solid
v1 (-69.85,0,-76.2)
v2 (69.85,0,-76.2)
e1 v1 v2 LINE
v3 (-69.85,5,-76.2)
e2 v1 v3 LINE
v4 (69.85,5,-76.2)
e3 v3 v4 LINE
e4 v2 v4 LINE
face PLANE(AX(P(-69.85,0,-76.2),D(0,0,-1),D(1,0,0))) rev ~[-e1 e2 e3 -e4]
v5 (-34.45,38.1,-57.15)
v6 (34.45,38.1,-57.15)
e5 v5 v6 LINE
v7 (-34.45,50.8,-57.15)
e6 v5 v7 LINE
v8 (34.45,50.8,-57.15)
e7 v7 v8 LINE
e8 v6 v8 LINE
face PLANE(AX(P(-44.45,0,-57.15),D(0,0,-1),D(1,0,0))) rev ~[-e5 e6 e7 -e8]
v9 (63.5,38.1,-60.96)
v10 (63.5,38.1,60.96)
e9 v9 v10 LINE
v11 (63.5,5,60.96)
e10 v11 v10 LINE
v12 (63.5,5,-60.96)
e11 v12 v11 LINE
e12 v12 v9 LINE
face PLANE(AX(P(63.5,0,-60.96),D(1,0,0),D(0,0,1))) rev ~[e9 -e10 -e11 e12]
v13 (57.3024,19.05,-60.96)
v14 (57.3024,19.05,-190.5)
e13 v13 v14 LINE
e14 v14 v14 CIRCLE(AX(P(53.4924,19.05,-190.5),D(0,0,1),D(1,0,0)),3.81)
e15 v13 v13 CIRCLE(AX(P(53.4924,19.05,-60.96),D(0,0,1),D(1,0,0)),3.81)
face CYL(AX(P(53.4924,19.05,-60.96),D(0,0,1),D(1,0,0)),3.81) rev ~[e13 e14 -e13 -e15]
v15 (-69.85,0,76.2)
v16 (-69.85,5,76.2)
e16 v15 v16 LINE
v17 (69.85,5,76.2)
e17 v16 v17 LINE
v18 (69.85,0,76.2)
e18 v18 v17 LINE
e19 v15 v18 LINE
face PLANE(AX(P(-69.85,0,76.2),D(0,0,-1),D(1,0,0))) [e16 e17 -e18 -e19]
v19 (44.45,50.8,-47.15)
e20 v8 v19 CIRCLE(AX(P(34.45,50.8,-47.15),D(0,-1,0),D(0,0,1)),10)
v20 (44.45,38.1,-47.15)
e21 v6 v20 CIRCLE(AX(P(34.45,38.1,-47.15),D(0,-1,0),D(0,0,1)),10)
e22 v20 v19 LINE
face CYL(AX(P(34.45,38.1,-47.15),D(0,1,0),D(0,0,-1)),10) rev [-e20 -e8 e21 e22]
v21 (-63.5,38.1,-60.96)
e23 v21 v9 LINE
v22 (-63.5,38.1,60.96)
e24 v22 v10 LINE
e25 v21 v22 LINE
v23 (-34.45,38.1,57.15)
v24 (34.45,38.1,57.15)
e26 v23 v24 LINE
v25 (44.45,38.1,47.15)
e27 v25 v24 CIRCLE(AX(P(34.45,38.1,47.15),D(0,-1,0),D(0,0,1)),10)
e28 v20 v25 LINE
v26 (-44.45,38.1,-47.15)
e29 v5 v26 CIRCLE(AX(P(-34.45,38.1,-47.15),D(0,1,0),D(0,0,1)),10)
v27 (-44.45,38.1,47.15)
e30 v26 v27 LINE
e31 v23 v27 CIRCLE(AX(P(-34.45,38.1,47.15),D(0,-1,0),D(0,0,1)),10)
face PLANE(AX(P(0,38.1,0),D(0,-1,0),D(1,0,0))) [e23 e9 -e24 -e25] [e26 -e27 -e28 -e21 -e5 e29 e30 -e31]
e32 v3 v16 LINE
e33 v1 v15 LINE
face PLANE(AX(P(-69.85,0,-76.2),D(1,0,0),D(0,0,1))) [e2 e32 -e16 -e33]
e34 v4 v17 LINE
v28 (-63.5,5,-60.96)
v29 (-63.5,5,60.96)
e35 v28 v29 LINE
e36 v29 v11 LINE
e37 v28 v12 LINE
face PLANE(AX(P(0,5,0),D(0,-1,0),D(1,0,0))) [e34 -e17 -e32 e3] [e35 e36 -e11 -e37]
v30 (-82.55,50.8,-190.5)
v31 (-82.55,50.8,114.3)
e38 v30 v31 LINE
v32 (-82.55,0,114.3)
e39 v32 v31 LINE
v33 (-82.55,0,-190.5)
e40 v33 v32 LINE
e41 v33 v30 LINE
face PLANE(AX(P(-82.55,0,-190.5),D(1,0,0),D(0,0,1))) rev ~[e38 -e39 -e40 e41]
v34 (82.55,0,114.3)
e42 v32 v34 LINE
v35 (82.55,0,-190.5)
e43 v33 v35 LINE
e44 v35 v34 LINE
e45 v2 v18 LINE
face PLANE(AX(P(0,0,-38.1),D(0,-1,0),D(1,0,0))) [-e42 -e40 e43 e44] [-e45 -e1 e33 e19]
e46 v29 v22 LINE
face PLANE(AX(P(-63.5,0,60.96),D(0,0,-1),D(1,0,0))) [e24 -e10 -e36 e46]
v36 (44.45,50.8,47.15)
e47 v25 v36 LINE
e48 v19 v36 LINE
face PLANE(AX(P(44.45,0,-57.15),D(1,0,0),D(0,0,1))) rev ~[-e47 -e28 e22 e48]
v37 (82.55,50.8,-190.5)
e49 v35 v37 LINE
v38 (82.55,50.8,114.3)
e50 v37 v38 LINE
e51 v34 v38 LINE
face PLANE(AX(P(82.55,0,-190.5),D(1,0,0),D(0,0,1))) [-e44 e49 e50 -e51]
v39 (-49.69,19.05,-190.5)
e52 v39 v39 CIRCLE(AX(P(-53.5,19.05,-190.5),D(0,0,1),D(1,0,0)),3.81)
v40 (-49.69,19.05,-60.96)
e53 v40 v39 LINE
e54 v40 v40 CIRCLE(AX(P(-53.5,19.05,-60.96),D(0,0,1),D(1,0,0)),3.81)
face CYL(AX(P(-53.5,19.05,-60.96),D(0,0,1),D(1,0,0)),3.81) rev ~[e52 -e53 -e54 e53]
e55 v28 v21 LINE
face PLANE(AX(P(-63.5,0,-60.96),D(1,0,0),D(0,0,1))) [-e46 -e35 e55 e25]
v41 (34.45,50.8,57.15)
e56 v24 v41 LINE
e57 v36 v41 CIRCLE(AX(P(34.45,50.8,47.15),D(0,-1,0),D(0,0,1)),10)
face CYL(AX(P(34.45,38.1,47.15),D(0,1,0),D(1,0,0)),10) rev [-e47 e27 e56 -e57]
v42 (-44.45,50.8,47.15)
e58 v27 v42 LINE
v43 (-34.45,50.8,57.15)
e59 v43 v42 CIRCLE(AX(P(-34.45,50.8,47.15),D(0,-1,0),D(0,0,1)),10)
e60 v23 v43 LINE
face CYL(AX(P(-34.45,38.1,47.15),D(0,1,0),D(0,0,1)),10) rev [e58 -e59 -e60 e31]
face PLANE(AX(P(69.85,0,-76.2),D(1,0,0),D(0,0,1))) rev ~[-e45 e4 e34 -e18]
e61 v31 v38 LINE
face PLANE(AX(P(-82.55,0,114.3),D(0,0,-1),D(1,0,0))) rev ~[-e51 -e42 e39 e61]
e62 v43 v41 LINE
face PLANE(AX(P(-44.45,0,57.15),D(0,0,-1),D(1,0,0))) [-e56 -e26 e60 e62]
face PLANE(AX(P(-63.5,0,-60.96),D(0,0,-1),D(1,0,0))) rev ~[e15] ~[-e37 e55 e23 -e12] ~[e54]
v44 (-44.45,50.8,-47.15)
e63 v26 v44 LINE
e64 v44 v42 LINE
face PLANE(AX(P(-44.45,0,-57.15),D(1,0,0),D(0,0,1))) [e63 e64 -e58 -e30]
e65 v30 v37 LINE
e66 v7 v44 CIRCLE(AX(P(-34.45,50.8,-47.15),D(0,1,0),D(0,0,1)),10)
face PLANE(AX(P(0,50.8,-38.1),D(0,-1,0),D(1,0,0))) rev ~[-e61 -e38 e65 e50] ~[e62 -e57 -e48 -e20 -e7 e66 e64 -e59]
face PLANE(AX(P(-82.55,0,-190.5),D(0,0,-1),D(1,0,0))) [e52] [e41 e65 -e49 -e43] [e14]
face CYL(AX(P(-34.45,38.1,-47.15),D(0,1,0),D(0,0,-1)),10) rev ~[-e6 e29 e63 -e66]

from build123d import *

# Parameters (mm, degrees)
F0_W     = 165.1
F0_H     = 304.8
F0_W_2   = 139.7
F0_H_2   = 152.4
F0_W_3   = 127
F0_H_3   = 121.92
F0_W_4   = 88.9
F0_H_4   = 114.3
F1_DEPTH = 50.8
F2_DEPTH = 5
F3_DEPTH = 38.1
F4_R     = 10
F5_R     = 3.81
F6_DEPTH = 129.54


# Not quite as in the source:
# - a feature names something its author has since deleted; it is built from what else it names


with BuildPart() as f1:
    # F0 (on Front) → F1 (new body)
    with BuildSketch(Plane.XZ):
        with Locations((0, -38.1)):
            Rectangle(F0_W, F0_H)
        Rectangle(F0_W_2, F0_H_2, mode=Mode.SUBTRACT)
        Rectangle(F0_W_2, F0_H_2)
        Rectangle(F0_W_3, F0_H_3, mode=Mode.SUBTRACT)
        Rectangle(F0_W_3, F0_H_3)
        Rectangle(F0_W_4, F0_H_4, mode=Mode.SUBTRACT)
    extrude(amount=-F1_DEPTH)

    # F0 (on Front) → F2 (cut)
    with BuildSketch(Plane.XZ):
        Rectangle(F0_W_2, F0_H_2)
        Rectangle(F0_W_3, F0_H_3, mode=Mode.SUBTRACT)
    extrude(amount=-F2_DEPTH, mode=Mode.SUBTRACT)

    # F0 (on Front) → F3 (cut)
    with BuildSketch(Plane.XZ):
        Rectangle(F0_W_3, F0_H_3)
        Rectangle(F0_W_4, F0_H_4, mode=Mode.SUBTRACT)
    extrude(amount=-F3_DEPTH, mode=Mode.SUBTRACT)

    # F4
    f4_edges = [f1.edges().sort_by_distance(p)[0] for p in [
        (-44.45, 44.45, 57.15),
        (44.45, 44.45, 57.15),
        (-44.45, 44.45, -57.15),
        (44.45, 44.45, -57.15),
    ]]
    fillet(f4_edges, radius=F4_R)

    # F5 (on face) → F6 (cut, through all)
    with BuildSketch(Plane.XY.offset(-60.96)):
        with Locations((-53.5, 19.05)):
            Circle(F5_R)
        with Locations((53.4924, 19.05)):
            Circle(F5_R)
    extrude(amount=-F6_DEPTH, mode=Mode.SUBTRACT)


solid = f1.part
